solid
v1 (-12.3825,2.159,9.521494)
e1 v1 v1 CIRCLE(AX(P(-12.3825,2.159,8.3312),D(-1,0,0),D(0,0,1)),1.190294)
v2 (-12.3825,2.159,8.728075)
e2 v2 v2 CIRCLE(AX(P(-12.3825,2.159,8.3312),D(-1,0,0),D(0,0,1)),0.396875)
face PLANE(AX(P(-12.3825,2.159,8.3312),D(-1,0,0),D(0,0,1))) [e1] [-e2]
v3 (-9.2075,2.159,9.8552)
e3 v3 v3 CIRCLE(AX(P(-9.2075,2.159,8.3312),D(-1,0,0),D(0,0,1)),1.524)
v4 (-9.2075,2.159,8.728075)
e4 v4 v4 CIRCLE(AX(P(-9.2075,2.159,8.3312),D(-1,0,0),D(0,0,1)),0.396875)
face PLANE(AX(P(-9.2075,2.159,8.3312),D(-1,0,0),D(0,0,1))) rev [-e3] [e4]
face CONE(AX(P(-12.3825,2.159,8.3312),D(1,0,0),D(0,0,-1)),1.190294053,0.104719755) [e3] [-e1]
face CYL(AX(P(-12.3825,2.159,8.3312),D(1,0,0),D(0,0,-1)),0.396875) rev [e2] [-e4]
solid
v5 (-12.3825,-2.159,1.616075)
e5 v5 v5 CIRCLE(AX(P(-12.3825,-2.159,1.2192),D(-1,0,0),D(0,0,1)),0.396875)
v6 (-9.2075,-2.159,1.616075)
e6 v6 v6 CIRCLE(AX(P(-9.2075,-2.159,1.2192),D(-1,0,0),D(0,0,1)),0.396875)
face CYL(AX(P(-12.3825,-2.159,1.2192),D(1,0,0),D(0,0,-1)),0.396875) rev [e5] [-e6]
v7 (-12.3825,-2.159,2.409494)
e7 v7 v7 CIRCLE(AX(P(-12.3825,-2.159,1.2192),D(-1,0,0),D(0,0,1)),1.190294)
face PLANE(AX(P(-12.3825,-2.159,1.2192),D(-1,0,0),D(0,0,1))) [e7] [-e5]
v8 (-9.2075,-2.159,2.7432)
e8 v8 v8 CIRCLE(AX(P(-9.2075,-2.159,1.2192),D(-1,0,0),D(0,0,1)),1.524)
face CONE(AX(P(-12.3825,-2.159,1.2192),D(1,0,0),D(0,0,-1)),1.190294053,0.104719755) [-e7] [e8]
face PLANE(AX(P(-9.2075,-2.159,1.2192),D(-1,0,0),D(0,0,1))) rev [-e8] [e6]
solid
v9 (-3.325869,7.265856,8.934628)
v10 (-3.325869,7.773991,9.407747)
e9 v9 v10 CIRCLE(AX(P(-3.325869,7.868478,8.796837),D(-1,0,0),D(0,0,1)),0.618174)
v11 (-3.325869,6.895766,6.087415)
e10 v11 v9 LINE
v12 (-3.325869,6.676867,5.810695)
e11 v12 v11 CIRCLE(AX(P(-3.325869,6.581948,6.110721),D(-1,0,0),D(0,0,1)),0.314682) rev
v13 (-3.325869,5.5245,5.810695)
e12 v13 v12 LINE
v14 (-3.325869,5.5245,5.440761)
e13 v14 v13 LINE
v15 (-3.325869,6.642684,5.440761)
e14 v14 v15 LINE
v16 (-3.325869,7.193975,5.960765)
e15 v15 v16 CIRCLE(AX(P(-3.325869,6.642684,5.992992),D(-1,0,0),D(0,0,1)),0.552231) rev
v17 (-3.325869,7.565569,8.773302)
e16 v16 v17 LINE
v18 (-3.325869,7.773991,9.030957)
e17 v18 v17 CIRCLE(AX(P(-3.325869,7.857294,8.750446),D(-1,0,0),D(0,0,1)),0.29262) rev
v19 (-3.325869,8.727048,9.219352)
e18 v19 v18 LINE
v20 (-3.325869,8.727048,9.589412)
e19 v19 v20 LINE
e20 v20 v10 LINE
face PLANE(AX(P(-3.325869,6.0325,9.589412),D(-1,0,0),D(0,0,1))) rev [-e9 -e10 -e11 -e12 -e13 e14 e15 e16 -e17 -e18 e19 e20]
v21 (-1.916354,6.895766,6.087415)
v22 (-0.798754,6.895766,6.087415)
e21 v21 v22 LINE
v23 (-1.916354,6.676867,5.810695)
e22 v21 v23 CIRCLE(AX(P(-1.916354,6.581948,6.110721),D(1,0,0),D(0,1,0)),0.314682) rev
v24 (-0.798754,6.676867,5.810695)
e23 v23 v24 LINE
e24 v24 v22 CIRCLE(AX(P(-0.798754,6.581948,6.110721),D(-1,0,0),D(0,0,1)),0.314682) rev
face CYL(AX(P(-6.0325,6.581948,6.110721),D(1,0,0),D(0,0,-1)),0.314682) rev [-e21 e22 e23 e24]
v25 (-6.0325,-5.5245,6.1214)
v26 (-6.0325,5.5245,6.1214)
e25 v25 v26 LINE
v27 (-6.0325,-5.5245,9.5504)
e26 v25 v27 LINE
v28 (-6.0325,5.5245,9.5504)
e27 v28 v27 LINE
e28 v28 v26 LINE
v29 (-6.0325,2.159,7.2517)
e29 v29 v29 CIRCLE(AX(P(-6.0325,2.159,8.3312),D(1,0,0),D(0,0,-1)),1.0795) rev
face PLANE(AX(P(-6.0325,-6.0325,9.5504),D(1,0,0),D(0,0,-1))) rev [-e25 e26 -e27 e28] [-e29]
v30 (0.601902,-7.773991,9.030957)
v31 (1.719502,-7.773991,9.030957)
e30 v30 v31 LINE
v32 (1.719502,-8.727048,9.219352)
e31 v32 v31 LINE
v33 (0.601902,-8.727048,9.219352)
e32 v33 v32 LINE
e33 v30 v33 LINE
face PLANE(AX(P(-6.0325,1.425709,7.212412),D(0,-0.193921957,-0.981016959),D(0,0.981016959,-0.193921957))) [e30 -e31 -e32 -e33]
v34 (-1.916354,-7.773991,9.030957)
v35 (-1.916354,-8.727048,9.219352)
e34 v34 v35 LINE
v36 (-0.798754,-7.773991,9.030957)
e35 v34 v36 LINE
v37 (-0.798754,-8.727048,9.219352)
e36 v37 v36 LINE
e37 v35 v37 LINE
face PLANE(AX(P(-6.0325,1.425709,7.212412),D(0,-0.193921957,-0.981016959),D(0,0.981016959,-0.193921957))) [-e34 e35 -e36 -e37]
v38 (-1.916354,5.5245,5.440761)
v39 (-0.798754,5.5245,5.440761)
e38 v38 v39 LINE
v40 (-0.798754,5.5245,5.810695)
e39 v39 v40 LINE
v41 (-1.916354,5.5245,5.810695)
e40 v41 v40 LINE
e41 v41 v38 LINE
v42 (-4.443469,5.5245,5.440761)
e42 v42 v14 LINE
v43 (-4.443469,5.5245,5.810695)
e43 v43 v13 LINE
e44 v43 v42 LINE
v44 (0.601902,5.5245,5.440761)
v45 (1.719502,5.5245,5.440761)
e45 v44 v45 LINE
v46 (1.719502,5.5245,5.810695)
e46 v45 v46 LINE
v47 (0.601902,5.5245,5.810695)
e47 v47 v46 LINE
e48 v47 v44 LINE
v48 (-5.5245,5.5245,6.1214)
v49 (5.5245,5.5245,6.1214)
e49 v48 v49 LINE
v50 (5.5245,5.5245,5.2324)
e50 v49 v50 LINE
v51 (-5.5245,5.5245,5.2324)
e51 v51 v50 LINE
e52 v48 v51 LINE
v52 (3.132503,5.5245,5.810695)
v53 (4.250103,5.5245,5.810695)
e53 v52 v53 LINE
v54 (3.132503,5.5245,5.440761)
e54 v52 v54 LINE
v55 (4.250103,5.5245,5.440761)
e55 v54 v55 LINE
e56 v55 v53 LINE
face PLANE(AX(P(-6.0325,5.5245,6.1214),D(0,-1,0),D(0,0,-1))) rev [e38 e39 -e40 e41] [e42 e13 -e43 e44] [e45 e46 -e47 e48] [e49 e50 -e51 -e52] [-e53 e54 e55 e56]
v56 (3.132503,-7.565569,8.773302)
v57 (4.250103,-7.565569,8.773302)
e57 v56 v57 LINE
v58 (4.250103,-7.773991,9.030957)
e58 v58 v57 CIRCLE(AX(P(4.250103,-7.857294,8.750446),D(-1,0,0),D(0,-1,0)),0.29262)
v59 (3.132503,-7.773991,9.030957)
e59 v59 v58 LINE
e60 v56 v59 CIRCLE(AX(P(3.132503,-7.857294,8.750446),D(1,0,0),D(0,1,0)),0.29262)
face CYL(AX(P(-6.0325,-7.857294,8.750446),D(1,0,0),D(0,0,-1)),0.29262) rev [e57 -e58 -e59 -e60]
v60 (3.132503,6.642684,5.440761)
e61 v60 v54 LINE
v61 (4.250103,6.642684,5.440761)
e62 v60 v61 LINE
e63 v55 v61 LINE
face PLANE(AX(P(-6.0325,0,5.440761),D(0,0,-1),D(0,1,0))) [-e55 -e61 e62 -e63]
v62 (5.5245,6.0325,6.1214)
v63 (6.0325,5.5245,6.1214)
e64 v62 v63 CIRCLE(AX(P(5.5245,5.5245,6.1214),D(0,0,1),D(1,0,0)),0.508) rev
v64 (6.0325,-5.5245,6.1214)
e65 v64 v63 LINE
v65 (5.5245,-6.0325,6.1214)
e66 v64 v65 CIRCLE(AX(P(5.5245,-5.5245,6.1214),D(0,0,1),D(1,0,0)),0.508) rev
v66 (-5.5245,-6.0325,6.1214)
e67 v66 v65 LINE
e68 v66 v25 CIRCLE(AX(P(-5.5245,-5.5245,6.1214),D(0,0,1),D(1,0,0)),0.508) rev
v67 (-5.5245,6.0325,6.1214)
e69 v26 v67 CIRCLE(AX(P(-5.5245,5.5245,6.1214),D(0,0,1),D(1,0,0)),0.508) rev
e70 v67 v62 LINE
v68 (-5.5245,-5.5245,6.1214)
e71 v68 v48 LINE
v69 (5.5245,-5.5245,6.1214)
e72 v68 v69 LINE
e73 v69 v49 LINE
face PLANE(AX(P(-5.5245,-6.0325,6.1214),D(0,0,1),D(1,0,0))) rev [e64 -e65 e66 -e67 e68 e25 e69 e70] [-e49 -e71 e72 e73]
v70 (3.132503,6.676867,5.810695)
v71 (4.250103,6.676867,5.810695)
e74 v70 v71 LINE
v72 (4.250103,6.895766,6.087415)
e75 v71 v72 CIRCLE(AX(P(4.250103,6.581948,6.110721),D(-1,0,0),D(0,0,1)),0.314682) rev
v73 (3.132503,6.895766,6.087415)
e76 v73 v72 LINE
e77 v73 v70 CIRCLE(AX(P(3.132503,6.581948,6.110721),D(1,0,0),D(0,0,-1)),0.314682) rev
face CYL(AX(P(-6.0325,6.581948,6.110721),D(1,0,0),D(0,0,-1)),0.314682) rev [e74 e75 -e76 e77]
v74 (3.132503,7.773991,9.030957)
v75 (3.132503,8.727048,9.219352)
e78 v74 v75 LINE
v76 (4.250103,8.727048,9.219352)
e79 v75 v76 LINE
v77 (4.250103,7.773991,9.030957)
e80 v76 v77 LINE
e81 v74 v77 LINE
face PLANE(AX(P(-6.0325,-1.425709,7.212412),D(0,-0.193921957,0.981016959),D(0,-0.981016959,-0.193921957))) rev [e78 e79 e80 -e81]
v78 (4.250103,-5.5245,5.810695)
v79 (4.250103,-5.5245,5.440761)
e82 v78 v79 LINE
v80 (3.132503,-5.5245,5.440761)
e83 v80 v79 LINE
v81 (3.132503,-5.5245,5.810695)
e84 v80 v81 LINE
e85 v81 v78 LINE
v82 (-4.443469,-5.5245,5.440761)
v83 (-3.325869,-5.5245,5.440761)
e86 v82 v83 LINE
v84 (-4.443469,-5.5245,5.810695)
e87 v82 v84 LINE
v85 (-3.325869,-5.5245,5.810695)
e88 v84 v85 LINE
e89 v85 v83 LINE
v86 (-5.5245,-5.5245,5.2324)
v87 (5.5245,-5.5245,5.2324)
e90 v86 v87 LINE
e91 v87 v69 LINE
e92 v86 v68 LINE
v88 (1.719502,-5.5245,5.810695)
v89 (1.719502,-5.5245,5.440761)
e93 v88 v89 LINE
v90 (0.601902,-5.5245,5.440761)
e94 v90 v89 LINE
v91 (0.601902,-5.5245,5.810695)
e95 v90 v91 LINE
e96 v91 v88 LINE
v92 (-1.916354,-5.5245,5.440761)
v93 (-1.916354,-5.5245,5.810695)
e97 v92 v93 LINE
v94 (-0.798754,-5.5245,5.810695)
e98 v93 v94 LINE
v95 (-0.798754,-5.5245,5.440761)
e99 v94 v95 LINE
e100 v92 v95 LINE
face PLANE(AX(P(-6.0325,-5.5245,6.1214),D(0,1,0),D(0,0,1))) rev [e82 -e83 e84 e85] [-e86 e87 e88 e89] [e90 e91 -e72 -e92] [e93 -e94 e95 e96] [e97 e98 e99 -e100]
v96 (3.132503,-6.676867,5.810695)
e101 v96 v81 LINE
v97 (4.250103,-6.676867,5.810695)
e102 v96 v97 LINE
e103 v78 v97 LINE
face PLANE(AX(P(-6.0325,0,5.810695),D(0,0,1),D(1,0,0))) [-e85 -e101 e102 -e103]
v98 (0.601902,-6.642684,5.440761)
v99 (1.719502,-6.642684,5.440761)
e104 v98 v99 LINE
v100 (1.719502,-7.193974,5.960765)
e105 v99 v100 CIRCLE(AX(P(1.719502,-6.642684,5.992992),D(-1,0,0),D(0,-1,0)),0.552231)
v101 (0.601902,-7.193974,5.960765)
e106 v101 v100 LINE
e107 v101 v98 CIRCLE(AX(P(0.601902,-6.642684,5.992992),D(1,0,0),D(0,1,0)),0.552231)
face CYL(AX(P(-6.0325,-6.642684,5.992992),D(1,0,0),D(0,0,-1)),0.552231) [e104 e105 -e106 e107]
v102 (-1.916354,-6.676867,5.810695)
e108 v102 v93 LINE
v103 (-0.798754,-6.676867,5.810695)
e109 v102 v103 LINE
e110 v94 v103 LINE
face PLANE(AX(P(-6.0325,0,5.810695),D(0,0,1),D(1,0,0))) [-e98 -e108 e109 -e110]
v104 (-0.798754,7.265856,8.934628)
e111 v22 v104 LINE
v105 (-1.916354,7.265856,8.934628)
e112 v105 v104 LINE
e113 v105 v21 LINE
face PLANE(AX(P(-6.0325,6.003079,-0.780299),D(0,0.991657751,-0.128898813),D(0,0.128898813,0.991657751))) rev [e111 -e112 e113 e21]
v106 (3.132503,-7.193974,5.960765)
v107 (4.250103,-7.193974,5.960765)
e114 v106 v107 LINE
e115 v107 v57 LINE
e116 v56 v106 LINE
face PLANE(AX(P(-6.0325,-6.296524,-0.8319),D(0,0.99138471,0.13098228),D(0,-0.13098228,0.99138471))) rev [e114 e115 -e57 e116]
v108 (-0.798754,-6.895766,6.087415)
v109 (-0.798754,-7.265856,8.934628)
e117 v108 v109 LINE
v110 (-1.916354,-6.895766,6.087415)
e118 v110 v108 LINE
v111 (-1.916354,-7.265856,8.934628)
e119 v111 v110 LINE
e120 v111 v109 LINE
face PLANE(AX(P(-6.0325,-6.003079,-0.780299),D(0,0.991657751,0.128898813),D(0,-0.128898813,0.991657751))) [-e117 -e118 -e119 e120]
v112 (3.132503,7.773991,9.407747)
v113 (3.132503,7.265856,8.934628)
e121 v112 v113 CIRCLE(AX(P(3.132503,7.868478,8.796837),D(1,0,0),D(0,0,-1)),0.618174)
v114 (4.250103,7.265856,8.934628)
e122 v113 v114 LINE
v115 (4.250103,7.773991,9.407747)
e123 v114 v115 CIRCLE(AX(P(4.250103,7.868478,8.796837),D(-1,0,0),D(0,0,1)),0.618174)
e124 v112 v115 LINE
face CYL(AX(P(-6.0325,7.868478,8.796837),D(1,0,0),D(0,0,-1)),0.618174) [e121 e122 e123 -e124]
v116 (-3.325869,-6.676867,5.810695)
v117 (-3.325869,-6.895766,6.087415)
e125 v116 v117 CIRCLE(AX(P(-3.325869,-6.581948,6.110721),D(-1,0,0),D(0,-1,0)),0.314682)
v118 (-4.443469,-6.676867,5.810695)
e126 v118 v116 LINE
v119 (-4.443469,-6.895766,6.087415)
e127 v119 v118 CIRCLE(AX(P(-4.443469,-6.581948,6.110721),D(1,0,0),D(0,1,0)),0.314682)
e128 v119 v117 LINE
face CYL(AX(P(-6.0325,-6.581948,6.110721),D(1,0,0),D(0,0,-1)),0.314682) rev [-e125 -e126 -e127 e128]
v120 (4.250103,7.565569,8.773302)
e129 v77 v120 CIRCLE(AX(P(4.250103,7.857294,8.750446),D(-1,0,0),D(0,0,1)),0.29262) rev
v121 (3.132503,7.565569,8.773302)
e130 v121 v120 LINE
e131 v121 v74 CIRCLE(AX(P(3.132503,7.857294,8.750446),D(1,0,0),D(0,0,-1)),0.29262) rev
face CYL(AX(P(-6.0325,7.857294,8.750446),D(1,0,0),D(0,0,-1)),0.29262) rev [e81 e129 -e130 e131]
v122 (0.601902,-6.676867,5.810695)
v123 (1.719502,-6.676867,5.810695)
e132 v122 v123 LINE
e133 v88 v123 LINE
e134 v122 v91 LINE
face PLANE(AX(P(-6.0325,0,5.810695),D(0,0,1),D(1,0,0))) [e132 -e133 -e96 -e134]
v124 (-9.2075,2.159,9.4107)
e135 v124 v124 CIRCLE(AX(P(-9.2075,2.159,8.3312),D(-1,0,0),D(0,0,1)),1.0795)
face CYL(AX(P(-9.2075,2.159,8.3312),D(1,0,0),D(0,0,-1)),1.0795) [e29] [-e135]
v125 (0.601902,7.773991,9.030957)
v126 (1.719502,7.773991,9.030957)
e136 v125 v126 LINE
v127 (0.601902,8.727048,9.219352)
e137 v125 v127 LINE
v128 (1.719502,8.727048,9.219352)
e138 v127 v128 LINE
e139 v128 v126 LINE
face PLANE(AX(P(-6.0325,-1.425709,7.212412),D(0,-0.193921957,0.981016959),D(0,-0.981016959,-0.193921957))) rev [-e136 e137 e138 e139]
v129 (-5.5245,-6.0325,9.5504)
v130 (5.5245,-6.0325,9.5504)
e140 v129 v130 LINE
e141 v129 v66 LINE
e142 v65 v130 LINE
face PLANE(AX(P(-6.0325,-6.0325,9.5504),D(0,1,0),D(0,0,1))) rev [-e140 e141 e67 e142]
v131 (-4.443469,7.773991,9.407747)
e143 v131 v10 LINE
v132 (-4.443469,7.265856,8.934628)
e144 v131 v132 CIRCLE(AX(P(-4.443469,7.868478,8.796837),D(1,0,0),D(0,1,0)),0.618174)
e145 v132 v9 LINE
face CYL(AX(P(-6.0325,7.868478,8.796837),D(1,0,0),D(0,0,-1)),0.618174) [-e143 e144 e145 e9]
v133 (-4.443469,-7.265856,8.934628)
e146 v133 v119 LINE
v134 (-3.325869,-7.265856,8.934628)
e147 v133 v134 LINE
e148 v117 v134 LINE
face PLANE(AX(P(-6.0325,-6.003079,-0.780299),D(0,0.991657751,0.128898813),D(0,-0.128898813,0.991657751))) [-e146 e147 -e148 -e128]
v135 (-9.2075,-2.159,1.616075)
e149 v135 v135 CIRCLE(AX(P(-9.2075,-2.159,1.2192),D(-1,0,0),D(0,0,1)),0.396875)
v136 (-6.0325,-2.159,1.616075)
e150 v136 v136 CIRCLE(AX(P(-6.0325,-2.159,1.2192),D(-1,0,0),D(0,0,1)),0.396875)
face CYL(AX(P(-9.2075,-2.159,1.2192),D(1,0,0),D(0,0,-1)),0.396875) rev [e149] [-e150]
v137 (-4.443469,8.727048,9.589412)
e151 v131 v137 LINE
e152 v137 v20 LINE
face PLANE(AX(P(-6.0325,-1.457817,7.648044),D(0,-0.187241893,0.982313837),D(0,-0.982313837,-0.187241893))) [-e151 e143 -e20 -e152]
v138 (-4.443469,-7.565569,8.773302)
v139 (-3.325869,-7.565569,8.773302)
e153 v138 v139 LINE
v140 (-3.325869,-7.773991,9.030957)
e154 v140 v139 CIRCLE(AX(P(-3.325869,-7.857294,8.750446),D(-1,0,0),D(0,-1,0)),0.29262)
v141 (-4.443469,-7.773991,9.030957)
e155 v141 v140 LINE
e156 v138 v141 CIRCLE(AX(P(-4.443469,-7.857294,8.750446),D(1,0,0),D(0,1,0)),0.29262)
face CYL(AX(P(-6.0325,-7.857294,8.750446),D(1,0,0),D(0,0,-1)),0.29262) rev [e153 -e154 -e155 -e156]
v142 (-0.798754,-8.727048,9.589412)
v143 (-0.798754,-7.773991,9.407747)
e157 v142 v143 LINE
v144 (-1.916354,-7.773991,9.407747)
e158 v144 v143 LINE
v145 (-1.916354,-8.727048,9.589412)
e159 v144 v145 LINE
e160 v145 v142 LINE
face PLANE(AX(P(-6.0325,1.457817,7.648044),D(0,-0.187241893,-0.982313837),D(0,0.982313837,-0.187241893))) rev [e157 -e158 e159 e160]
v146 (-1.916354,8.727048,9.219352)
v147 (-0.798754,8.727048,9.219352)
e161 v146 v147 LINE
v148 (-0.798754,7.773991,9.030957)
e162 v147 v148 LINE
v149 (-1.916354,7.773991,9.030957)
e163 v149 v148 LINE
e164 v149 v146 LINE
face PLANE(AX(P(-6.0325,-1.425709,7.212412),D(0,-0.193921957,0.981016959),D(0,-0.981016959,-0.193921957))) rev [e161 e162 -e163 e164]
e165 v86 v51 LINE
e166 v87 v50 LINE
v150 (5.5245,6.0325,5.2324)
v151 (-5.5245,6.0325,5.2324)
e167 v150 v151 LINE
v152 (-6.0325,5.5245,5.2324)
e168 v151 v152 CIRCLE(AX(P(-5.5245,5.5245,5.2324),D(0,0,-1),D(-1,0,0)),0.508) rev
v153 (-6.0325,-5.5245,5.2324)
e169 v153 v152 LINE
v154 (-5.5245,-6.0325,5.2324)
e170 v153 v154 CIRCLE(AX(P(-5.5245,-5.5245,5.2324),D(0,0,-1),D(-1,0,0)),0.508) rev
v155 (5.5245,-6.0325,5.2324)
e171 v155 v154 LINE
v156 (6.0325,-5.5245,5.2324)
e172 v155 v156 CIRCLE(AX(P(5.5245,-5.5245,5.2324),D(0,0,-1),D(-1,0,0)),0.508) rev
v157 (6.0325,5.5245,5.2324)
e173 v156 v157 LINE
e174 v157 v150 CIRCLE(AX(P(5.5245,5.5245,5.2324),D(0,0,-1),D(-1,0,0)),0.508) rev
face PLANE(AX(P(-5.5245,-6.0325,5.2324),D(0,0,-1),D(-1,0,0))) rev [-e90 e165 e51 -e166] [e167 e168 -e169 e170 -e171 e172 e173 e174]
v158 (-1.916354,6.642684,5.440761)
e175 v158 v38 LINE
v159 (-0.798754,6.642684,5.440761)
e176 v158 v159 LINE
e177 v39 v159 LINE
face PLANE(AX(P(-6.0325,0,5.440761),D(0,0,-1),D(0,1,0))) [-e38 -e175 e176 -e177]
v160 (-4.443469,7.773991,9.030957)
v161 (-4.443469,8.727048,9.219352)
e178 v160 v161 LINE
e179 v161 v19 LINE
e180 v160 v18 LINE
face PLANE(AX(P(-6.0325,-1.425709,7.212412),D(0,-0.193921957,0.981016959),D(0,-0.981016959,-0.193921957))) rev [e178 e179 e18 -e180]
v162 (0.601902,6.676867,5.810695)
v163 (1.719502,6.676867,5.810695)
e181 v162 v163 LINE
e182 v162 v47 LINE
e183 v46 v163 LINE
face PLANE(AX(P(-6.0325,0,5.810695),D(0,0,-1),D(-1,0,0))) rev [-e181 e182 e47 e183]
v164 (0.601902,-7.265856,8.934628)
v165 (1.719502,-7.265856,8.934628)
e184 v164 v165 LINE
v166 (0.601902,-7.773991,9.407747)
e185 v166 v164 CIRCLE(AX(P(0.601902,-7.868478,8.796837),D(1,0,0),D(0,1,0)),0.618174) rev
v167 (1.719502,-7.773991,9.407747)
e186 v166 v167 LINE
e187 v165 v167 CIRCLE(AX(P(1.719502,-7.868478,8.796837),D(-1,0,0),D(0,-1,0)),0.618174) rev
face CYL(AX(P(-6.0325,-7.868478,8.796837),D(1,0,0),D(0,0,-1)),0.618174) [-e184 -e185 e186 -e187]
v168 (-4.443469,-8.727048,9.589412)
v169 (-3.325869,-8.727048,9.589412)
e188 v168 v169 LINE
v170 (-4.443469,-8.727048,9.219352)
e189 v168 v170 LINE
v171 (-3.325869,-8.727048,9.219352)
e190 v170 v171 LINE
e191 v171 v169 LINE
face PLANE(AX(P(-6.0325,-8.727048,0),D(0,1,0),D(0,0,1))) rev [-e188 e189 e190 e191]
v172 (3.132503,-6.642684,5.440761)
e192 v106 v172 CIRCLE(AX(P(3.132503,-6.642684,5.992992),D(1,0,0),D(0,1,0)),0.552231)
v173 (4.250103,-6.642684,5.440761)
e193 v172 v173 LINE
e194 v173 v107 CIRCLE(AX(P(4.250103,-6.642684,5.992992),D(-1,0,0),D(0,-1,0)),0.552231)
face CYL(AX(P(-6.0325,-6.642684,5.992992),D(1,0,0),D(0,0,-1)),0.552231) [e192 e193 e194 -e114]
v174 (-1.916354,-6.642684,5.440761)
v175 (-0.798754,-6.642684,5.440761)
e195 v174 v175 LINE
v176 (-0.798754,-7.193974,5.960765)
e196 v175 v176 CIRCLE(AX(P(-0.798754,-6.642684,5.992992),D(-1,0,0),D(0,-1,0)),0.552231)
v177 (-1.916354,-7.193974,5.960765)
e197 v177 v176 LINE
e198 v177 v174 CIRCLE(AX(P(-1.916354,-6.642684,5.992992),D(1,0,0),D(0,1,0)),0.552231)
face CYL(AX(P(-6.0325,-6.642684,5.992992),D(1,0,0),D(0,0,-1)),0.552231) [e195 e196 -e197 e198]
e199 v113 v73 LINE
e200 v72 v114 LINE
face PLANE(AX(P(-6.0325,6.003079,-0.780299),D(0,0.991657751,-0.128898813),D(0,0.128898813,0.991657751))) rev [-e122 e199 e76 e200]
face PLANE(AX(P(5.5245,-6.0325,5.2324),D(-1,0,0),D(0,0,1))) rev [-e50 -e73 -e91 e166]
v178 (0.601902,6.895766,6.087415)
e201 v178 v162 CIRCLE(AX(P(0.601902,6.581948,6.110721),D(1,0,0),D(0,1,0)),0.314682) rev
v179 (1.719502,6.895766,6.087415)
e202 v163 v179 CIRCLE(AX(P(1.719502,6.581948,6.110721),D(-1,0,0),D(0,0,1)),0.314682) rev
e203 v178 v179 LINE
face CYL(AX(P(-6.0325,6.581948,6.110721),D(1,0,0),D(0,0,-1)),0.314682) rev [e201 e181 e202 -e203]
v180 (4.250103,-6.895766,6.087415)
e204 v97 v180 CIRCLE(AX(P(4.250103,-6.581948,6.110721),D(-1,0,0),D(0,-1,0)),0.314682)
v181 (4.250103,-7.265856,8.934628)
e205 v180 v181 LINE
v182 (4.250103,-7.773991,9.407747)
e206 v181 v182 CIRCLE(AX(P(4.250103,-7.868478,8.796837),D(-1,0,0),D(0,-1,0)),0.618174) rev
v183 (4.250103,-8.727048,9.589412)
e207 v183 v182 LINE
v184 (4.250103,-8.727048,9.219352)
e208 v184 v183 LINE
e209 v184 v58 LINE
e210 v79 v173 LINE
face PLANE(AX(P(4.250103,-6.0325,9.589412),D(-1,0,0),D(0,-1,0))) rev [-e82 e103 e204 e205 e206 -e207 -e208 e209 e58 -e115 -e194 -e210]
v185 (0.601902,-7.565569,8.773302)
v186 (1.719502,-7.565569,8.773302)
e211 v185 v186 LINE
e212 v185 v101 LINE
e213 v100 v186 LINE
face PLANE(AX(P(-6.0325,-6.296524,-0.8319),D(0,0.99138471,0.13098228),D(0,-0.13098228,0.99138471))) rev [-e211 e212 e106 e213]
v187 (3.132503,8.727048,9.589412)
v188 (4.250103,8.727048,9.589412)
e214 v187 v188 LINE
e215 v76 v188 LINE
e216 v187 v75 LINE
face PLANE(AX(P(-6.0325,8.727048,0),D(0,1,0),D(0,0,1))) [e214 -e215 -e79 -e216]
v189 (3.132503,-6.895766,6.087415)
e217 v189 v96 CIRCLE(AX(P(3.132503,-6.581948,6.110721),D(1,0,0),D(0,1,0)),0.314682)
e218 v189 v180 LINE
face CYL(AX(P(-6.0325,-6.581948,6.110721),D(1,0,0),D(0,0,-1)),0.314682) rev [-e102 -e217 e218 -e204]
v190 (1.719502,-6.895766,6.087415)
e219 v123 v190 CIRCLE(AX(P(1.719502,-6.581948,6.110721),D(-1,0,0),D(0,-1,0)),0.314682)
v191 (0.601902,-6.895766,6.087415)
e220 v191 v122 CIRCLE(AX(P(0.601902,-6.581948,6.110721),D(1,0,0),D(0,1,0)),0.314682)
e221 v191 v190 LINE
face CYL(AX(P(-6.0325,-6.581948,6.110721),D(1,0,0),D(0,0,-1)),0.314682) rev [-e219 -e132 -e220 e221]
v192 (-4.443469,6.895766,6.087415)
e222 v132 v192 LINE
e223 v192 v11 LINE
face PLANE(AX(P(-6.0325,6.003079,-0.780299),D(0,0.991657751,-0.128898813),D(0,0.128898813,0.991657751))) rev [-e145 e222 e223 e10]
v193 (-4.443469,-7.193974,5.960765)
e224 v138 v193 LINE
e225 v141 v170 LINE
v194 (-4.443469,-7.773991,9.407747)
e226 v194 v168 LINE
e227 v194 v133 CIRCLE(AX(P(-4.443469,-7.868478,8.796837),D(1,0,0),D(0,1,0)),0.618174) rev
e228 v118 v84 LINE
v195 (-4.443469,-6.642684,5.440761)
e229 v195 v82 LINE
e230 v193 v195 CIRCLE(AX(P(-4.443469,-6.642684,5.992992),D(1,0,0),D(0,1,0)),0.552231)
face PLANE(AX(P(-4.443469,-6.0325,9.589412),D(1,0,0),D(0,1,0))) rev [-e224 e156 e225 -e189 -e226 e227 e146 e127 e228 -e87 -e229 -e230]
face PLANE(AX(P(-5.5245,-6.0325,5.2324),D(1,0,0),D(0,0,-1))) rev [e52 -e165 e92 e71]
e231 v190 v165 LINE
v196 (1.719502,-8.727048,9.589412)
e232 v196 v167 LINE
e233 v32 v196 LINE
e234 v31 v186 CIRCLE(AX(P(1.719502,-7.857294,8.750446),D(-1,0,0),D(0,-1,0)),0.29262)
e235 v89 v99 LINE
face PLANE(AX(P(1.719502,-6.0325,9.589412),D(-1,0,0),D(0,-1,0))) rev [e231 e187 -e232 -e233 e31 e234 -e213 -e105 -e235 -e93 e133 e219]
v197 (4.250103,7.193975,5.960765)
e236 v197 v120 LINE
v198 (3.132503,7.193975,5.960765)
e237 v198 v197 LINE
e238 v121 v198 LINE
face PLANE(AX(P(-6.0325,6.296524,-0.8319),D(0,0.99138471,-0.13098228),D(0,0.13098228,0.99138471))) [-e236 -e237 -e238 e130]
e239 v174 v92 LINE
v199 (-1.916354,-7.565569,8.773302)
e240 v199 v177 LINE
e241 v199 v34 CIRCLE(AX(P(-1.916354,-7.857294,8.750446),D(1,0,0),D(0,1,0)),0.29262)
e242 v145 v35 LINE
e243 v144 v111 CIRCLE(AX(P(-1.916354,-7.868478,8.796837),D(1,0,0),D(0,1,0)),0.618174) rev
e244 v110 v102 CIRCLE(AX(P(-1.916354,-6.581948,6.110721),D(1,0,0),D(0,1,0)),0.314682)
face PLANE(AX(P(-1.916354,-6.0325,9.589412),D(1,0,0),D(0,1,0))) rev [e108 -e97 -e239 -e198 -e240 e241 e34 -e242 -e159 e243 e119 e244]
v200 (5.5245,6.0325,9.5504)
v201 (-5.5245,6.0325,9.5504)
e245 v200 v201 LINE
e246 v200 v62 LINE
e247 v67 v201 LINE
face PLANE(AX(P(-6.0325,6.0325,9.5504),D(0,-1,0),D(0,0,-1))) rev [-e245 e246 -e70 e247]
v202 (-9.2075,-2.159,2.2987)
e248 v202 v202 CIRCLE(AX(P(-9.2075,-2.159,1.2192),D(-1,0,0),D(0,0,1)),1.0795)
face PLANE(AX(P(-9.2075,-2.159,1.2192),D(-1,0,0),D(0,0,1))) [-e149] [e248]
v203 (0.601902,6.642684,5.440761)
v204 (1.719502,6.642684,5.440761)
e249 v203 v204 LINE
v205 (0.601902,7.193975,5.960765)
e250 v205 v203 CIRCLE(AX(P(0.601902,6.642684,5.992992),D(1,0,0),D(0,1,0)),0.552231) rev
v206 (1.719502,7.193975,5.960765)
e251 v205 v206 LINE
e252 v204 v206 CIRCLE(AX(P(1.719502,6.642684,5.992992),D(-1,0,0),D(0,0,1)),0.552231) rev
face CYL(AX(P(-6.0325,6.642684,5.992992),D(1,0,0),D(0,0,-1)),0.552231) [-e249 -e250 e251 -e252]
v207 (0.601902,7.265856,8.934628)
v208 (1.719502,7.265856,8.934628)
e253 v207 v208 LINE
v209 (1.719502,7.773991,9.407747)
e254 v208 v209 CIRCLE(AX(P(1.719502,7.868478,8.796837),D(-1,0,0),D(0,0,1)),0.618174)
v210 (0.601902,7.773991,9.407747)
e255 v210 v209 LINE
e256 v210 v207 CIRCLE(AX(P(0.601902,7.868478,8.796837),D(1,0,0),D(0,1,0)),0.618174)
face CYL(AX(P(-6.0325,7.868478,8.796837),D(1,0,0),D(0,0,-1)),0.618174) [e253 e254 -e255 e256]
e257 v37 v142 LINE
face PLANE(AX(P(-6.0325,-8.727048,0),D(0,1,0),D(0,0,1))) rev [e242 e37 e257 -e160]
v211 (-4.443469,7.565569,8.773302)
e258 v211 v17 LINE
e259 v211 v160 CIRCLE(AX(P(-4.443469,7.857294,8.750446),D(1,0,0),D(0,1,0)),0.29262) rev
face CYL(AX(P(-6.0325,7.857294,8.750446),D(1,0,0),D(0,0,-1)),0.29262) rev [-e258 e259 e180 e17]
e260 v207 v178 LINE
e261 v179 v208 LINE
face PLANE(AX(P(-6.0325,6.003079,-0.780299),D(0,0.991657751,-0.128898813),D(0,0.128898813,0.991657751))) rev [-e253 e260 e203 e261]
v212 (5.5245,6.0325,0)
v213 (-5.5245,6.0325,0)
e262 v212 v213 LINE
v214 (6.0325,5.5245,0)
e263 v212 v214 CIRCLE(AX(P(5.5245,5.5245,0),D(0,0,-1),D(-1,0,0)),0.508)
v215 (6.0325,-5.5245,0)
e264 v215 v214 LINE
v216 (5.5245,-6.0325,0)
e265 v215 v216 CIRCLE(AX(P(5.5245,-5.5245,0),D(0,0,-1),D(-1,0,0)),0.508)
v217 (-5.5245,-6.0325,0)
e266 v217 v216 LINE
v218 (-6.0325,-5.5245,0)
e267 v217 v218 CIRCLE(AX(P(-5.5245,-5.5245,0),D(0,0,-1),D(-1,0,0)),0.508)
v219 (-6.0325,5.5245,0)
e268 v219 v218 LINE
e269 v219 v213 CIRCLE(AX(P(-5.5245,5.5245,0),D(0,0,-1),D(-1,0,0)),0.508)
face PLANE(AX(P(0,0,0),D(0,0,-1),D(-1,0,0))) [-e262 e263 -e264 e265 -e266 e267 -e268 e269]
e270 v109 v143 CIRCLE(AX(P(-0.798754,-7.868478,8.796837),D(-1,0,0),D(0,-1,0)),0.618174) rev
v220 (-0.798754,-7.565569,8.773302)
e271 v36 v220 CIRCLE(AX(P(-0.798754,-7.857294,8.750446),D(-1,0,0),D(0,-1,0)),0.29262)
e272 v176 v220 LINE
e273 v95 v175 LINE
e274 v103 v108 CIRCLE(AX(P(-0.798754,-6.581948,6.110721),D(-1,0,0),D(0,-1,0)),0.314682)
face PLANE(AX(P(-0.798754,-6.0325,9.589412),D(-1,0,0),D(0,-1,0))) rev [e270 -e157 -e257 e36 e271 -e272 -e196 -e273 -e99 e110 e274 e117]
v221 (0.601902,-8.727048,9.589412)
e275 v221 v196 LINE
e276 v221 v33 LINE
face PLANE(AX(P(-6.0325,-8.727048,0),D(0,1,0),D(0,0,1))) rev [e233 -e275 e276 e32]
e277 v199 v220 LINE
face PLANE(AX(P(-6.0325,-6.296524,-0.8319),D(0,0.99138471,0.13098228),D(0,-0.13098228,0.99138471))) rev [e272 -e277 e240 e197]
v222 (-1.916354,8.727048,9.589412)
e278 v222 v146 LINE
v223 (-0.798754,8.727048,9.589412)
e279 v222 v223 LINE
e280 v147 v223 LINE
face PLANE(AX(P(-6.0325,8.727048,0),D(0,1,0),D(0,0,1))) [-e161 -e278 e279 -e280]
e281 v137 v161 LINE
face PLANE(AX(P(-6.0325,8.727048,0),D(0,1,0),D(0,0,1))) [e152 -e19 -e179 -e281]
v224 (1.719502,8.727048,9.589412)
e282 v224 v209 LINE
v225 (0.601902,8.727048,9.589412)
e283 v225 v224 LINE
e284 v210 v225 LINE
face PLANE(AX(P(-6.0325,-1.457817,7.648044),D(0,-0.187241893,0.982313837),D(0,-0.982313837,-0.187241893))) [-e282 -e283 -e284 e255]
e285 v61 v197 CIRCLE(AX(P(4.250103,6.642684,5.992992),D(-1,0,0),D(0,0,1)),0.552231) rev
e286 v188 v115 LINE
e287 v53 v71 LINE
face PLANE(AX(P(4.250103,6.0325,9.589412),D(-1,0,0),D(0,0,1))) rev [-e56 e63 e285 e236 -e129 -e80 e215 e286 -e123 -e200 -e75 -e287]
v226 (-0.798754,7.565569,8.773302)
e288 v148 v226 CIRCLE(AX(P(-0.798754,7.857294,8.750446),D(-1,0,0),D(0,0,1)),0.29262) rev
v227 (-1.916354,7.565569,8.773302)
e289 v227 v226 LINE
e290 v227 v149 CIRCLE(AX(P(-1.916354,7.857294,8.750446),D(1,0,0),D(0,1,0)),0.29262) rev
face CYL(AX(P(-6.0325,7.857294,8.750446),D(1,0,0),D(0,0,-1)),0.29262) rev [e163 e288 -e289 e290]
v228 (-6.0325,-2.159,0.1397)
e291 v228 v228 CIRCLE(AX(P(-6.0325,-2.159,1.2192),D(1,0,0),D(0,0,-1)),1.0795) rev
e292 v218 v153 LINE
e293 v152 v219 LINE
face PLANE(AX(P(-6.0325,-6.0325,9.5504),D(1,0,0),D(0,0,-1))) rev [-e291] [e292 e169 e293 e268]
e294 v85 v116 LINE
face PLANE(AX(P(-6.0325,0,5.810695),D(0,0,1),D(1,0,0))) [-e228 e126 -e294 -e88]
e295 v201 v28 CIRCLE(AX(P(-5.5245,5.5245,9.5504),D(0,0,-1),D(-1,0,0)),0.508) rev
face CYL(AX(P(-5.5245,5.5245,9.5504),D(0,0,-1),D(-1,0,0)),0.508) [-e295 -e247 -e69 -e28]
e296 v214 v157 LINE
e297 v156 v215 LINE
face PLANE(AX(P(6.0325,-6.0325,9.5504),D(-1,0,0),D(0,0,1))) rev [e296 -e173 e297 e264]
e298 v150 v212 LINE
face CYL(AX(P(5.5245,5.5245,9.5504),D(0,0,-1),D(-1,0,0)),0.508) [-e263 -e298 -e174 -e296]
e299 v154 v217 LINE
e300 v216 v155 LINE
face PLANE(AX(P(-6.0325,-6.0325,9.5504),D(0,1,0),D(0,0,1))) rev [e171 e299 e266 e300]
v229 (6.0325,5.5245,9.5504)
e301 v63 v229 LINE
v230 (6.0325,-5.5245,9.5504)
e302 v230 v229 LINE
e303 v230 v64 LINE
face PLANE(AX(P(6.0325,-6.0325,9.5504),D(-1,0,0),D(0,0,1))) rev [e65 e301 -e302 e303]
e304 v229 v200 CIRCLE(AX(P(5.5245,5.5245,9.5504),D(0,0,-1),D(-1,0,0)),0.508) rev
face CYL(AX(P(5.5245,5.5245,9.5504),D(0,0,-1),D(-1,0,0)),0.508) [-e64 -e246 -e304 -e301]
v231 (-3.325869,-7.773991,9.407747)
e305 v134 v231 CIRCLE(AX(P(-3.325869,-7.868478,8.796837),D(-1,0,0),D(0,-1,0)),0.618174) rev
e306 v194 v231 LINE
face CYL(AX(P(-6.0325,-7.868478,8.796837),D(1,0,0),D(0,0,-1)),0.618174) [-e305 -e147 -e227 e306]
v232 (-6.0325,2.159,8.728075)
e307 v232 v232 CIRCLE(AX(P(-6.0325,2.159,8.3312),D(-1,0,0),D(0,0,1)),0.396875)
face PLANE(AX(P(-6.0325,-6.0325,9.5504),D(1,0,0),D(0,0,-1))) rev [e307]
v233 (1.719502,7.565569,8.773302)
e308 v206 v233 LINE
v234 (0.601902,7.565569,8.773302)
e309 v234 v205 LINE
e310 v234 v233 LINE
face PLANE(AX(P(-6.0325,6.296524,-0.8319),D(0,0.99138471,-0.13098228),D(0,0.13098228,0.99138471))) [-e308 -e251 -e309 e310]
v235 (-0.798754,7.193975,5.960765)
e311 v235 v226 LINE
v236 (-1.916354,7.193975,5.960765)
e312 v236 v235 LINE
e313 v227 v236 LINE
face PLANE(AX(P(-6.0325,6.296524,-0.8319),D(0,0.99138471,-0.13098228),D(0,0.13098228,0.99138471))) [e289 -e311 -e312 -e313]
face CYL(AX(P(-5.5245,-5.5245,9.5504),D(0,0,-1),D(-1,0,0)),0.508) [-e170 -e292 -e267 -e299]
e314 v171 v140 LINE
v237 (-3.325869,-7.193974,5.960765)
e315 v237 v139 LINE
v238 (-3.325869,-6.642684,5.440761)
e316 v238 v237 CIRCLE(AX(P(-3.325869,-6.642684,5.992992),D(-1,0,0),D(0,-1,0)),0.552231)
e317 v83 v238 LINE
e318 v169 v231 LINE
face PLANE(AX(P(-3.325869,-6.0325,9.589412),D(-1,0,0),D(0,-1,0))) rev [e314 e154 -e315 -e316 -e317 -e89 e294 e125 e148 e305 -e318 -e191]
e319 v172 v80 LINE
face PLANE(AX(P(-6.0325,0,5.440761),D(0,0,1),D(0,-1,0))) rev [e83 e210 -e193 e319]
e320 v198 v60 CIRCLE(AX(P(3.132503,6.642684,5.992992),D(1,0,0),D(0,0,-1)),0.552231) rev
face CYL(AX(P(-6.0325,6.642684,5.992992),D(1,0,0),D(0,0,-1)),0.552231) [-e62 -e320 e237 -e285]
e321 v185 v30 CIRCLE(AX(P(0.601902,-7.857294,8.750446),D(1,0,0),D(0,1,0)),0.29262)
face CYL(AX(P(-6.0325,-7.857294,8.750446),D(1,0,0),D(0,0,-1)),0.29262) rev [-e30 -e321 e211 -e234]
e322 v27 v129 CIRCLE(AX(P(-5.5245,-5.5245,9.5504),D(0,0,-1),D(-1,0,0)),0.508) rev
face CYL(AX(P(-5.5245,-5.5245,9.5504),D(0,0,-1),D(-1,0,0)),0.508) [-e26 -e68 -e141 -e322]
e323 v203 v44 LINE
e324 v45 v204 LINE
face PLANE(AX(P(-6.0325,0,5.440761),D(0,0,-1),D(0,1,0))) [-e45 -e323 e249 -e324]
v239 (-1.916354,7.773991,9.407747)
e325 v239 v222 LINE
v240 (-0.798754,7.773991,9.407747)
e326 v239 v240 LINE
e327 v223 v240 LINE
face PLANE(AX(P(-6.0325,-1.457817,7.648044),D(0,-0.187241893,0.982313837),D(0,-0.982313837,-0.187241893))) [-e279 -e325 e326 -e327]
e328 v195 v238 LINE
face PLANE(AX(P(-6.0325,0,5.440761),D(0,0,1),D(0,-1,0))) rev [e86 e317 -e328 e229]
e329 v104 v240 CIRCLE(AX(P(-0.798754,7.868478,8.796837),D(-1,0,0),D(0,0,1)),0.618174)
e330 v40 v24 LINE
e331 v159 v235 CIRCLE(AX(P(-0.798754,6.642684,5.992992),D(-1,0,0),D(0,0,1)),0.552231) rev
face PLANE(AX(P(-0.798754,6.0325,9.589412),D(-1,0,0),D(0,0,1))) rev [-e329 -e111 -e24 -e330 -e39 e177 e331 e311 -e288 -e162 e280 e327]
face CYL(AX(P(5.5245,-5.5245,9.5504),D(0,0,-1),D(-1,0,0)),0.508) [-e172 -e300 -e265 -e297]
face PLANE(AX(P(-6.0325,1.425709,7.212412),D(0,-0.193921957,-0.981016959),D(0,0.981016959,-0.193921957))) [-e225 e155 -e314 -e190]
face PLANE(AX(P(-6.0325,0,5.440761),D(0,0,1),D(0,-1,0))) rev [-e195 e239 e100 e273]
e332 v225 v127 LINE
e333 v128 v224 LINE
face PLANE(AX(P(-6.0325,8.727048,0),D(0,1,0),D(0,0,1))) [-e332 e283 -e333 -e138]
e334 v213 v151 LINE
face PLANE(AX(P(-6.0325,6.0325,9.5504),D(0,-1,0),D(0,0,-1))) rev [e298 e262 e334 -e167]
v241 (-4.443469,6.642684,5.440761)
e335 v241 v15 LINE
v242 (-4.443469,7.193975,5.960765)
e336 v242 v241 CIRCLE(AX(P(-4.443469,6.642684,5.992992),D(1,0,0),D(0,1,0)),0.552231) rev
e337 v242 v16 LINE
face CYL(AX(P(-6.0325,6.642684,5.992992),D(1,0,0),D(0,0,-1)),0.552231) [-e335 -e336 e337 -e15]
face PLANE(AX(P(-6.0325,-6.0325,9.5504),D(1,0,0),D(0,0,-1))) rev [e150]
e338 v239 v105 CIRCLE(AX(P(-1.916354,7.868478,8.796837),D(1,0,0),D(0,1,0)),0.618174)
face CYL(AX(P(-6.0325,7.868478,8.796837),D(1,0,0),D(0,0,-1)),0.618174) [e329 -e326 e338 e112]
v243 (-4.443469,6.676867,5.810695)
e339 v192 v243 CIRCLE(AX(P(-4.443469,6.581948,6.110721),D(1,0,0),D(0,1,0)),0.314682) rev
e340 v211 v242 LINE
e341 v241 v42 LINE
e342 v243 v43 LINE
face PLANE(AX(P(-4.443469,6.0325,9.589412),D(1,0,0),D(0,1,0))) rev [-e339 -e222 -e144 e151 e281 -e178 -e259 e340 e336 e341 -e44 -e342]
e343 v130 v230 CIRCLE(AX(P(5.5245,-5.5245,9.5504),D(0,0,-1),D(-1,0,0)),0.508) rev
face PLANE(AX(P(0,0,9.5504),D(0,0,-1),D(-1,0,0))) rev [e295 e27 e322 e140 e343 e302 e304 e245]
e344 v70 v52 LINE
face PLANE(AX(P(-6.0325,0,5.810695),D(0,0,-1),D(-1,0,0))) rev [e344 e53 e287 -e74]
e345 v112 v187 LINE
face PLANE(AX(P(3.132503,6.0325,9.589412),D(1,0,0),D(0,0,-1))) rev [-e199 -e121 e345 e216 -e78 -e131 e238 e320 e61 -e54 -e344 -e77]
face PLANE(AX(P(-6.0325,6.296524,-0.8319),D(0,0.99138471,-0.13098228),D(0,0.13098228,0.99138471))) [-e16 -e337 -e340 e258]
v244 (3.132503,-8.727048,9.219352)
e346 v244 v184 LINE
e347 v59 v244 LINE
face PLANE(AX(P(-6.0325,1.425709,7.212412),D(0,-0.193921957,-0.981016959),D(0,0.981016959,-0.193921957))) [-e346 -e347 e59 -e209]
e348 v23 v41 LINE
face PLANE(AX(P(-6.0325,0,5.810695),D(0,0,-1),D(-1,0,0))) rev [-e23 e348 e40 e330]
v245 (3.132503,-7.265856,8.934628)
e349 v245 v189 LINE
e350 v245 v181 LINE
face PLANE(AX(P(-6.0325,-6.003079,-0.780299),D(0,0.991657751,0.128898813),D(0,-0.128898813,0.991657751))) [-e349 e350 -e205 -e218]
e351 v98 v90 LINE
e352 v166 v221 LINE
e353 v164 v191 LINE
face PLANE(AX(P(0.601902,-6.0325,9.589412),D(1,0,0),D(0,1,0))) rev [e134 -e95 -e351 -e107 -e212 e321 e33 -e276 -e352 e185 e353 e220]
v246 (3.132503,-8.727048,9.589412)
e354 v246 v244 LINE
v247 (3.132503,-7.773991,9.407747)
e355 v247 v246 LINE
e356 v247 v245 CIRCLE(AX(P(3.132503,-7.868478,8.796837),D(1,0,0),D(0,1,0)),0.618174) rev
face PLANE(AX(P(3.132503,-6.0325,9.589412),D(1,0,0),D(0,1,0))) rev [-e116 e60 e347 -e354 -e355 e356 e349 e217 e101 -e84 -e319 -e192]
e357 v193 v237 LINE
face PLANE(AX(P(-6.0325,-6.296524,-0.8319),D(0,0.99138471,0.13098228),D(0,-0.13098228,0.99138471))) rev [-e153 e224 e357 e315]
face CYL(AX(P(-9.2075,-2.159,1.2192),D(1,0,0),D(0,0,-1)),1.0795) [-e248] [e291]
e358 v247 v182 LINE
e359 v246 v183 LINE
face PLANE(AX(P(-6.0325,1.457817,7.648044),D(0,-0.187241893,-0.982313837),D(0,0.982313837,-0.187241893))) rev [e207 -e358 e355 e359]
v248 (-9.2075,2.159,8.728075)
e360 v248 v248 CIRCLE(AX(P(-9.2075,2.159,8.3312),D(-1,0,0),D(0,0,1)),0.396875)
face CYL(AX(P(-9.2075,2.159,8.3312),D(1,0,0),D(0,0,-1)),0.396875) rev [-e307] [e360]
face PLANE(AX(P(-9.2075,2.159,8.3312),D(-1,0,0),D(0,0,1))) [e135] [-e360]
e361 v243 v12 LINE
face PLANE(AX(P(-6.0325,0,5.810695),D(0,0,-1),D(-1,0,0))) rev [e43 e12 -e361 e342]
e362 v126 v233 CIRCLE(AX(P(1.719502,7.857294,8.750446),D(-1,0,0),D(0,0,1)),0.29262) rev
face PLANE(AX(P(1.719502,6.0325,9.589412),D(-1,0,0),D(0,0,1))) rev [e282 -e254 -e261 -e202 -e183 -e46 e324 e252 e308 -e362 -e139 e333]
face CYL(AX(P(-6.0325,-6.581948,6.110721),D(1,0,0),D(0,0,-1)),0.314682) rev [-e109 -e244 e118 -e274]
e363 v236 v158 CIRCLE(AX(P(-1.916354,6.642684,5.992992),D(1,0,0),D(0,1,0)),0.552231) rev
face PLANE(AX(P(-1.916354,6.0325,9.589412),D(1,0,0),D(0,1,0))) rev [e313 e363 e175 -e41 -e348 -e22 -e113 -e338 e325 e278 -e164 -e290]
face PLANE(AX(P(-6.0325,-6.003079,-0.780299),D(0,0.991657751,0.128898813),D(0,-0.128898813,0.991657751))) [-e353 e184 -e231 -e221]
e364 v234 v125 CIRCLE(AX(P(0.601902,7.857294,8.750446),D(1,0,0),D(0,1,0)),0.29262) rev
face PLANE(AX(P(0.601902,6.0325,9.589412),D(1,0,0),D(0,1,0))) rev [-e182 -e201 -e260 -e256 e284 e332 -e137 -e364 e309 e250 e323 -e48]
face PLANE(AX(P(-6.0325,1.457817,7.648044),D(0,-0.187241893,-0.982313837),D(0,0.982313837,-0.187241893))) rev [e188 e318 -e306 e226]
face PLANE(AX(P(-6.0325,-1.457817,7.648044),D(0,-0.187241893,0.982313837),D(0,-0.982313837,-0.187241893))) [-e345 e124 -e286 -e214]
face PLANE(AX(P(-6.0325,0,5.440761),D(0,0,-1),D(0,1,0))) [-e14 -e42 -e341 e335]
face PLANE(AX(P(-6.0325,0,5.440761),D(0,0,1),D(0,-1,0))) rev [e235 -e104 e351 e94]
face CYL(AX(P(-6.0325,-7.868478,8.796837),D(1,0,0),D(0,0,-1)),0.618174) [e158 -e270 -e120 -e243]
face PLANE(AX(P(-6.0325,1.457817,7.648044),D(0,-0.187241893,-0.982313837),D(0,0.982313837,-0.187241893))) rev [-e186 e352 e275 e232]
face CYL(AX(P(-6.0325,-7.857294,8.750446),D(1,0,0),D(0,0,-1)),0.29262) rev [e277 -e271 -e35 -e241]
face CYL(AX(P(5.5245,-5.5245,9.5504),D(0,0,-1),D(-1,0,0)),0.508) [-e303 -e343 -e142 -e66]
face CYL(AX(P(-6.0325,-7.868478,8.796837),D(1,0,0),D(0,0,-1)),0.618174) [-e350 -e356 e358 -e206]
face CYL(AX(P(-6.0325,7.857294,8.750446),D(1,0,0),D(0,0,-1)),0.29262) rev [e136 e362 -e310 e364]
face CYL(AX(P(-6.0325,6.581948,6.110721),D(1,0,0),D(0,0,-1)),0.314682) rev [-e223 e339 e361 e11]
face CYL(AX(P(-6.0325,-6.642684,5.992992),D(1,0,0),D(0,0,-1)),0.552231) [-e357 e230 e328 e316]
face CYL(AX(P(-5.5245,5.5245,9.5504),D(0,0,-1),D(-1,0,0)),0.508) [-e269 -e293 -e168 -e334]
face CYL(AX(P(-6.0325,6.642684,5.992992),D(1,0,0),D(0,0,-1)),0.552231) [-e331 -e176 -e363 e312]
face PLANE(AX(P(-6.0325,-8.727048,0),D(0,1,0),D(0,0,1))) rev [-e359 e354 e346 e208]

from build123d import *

# Parameters (mm, degrees)
SKETCH1_W             = 12.065
SKETCH1_H             = 12.065
BOSS_EXTRUDE1_DEPTH   = 9.5504
SKETCH3_W             = 0.508
SKETCH3_H             = 0.889
CUT_EXTRUDE1_DEPTH    = 17.527716763
SKETCH4_W             = 0.889
SKETCH4_H             = 0.508
CUT_EXTRUDE2_DEPTH    = 17.160614017
BOSS_EXTRUDE2_DEPTH   = 12.065
SKETCH6_W             = 2.010508142
SKETCH6_H             = 3.048
SKETCH6_W_2           = 1.413000982
SKETCH6_W_3           = 1.400656211
SKETCH6_W_4           = 1.409514657
SKETCH6_W_5           = 1.742646619
CUT_EXTRUDE3_DEPTH    = 15.300672912
SKETCH7_W             = 1.589030952
SKETCH7_H             = 0.369934407
SKETCH7_W_2           = 1.409514657
SKETCH7_W_3           = 1.400656211
SKETCH7_W_4           = 1.413000982
SKETCH7_W_5           = 1.782397198
CUT_EXTRUDE4_DEPTH    = 0.508
SKETCH8_W             = 1.589030952
SKETCH8_H             = 0.369934407
SKETCH8_W_2           = 1.409514657
SKETCH8_W_3           = 1.400656211
SKETCH8_W_4           = 1.413000982
SKETCH8_W_5           = 1.782397198
CUT_EXTRUDE5_DEPTH    = 0.508
FILLET1_R             = 0.508
SKETCH9_R             = 1.0795
SKETCH9_R_2           = 0.396875
BOSS_EXTRUDE3_DEPTH   = 3.175
SKETCH10_R            = 1.524
SKETCH10_R_2          = 0.396875
BOSS_EXTRUDE4_DEPTH   = 3.175
BOSS_EXTRUDE4_2_DEPTH = 3.175
CHAMFER1_SIZE         = 3.175
CHAMFER1_SIZE_2       = 0.333705947
CHAMFER2_SIZE         = 3.175
CHAMFER2_SIZE_2       = 0.333705947


with BuildPart() as part:
    # Sketch1 → Boss-Extrude1 (new body)
    with BuildSketch(Plane.XY):
        Rectangle(SKETCH1_W, SKETCH1_H)
    extrude(amount=BOSS_EXTRUDE1_DEPTH)

    # Sketch3 → Cut-Extrude1 (cut, through all)
    with BuildSketch(Plane(origin=(0, 6.0325, 0), x_dir=(1, 0, 0), z_dir=(0, 1, 0))):
        with Locations((-5.7785, -5.6769)):
            Rectangle(SKETCH3_W, SKETCH3_H)
        with Locations((5.7785, -5.6769)):
            Rectangle(SKETCH3_W, SKETCH3_H)
    extrude(amount=-CUT_EXTRUDE1_DEPTH, mode=Mode.SUBTRACT)

    # Sketch4 → Cut-Extrude2 (cut, through all)
    with BuildSketch(Plane(origin=(5.5245, 0, 0), x_dir=(0, 0, -1), z_dir=(1, 0, 0))):
        with Locations((-5.6769, 5.7785)):
            Rectangle(SKETCH4_W, SKETCH4_H)
        with Locations((-5.6769, -5.7785)):
            Rectangle(SKETCH4_W, SKETCH4_H)
    extrude(amount=-CUT_EXTRUDE2_DEPTH, mode=Mode.SUBTRACT)

    # Sketch5 → Boss-Extrude2 (add, through all)
    with BuildSketch(Plane(origin=(6.0325, 0, 0), x_dir=(0, 0, -1), z_dir=(1, 0, 0))):
        with BuildLine():
            ThreePointArc((-8.934627895, 7.265855746), (-9.249262248, 7.447228638), (-9.407747298, 7.773990618))
            Line((-9.407747298, 7.773990618), (-9.589412438, 8.72704753))
            Line((-9.589412438, 8.72704753), (-9.219352327, 8.72704753))
            Line((-9.219352327, 8.72704753), (-9.030957356, 7.773990618))
            ThreePointArc((-9.030957356, 7.773990618), (-8.934478337, 7.629789758), (-8.773302251, 7.565568589))
            Line((-8.773302251, 7.565568589), (-5.960764741, 7.193974625))
            ThreePointArc((-5.960764741, 7.193974625), (-5.591273278, 7.021604846), (-5.440761064, 6.642683921))
            Line((-5.440761064, 6.642683921), (-5.440761064, 5.5245))
            Line((-5.440761064, 5.5245), (-5.810695471, 5.5245))
            Line((-5.810695471, 5.5245), (-5.810695471, 6.676866964))
            ThreePointArc((-5.810695471, 6.676866964), (-5.915490425, 6.828747463), (-6.087415345, 6.895766048))
            Line((-6.087415345, 6.895766048), (-8.934627895, 7.265855746))
        make_face()
        with BuildLine():
            ThreePointArc((-5.440761064, -6.642683921), (-5.591273278, -7.021604846), (-5.960764741, -7.193974625))
            Line((-5.960764741, -7.193974625), (-8.773302251, -7.565568589))
            ThreePointArc((-8.773302251, -7.565568589), (-8.934478337, -7.629789758), (-9.030957356, -7.773990618))
            Line((-9.030957356, -7.773990618), (-9.219352327, -8.72704753))
            Line((-9.219352327, -8.72704753), (-9.589412438, -8.72704753))
            Line((-9.589412438, -8.72704753), (-9.407747298, -7.773990618))
            ThreePointArc((-9.407747298, -7.773990618), (-9.249262248, -7.447228638), (-8.934627895, -7.265855746))
            Line((-8.934627895, -7.265855746), (-6.087415345, -6.895766048))
            ThreePointArc((-6.087415345, -6.895766048), (-5.915490425, -6.828747463), (-5.810695471, -6.676866964))
            Line((-5.810695471, -6.676866964), (-5.810695471, -5.5245))
            Line((-5.810695471, -5.5245), (-5.440761064, -5.5245))
            Line((-5.440761064, -5.5245), (-5.440761064, -6.642683921))
        make_face()
    extrude(amount=-BOSS_EXTRUDE2_DEPTH)

    # Sketch6 → Cut-Extrude3 (cut, through all)
    with BuildSketch(Plane(origin=(0, 0, 0), x_dir=(-1, 0, 0), z_dir=(0, 0, -1))):
        with Locations((-5.255356873, 7.5565)):
            Rectangle(SKETCH6_W, SKETCH6_H)
        with Locations((-2.426002311, 7.5565)):
            Rectangle(SKETCH6_W_2, SKETCH6_H)
        with Locations((0.098426285, 7.5565)):
            Rectangle(SKETCH6_W_3, SKETCH6_H)
        with Locations((2.621111719, 7.5565)):
            Rectangle(SKETCH6_W_4, SKETCH6_H)
        with Locations((5.314792358, 7.5565)):
            Rectangle(SKETCH6_W_5, SKETCH6_H)
        with Locations((5.314792358, -7.5565)):
            Rectangle(SKETCH6_W_5, SKETCH6_H)
        with Locations((2.621111719, -7.5565)):
            Rectangle(SKETCH6_W_4, SKETCH6_H)
        with Locations((0.098426285, -7.5565)):
            Rectangle(SKETCH6_W_3, SKETCH6_H)
        with Locations((-2.426002311, -7.5565)):
            Rectangle(SKETCH6_W_2, SKETCH6_H)
        with Locations((-5.255356873, -7.5565)):
            Rectangle(SKETCH6_W, SKETCH6_H)
    extrude(amount=-CUT_EXTRUDE3_DEPTH, mode=Mode.SUBTRACT)

    # Sketch7 → Cut-Extrude4 (cut)
    with BuildSketch(Plane(origin=(0, 6.0325, 0), x_dir=(1, 0, 0), z_dir=(0, 1, 0))):
        with Locations((-5.237984524, -5.625728268)):
            Rectangle(SKETCH7_W, SKETCH7_H)
        with Locations((-2.621111719, -5.625728268)):
            Rectangle(SKETCH7_W_2, SKETCH7_H)
        with Locations((-0.098426285, -5.625728268)):
            Rectangle(SKETCH7_W_3, SKETCH7_H)
        with Locations((2.426002311, -5.625728268)):
            Rectangle(SKETCH7_W_4, SKETCH7_H)
        with Locations((5.141301401, -5.625728268)):
            Rectangle(SKETCH7_W_5, SKETCH7_H)
    extrude(amount=-CUT_EXTRUDE4_DEPTH, mode=Mode.SUBTRACT)

    # Sketch8 → Cut-Extrude5 (cut)
    with BuildSketch(Plane.XZ.offset(6.0325)):
        with Locations((-5.237984524, 5.625728268)):
            Rectangle(SKETCH8_W, SKETCH8_H)
        with Locations((-2.621111719, 5.625728268)):
            Rectangle(SKETCH8_W_2, SKETCH8_H)
        with Locations((-0.098426285, 5.625728268)):
            Rectangle(SKETCH8_W_3, SKETCH8_H)
        with Locations((2.426002311, 5.625728268)):
            Rectangle(SKETCH8_W_4, SKETCH8_H)
        with Locations((5.141301401, 5.625728268)):
            Rectangle(SKETCH8_W_5, SKETCH8_H)
    extrude(amount=-CUT_EXTRUDE5_DEPTH, mode=Mode.SUBTRACT)

    # Fillet1
    fillet1_edges = [part.edges().sort_by_distance(p)[0] for p in [
        (6.0325, 6.0325, 2.6162),
        (6.0325, 6.0325, 7.8359),
        (-6.0325, 6.0325, 7.8359),
        (-6.0325, 6.0325, 2.6162),
        (-6.0325, -6.0325, 7.8359),
        (-6.0325, -6.0325, 2.6162),
        (6.0325, -6.0325, 7.8359),
        (6.0325, -6.0325, 2.6162),
    ]]
    fillet(fillet1_edges, radius=FILLET1_R)

    # Sketch9 → Boss-Extrude3 (add)
    # profile 1 of 2: a face of its own
    with BuildSketch(Plane.ZY.offset(6.0325)):
        with Locations(Location((1.2192, -2.159, 0), (0, 0, 180))):
            Circle(SKETCH9_R)
        with Locations((1.2192, -2.159)):
            Circle(SKETCH9_R_2, mode=Mode.SUBTRACT)
    # profile 2 of 2: a face of its own
    with BuildSketch(Plane.ZY.offset(6.0325)):
        with Locations(Location((8.3312, 2.159, 0), (0, 0, 180))):
            Circle(SKETCH9_R)
        with Locations((8.3312, 2.159)):
            Circle(SKETCH9_R_2, mode=Mode.SUBTRACT)
    extrude(amount=BOSS_EXTRUDE3_DEPTH)


with BuildPart() as body_2:
    # Sketch10 → Boss-Extrude4 (new body)
    with BuildSketch(Plane.ZY.offset(9.2075)):
        with Locations((1.2192, -2.159)):
            Circle(SKETCH10_R)
        with Locations((1.2192, -2.159)):
            Circle(SKETCH10_R_2, mode=Mode.SUBTRACT)
    extrude(amount=BOSS_EXTRUDE4_DEPTH)

    # Chamfer2
    # the kernel refuses this chamfer: 3.175, 0.333705947 mm, written as the material it takes off along each edge
    with BuildSketch(Plane(origin=(-12.3825, -2.159, 1.2192), x_dir=(0, 0, 1), z_dir=(0, -1, 0))) as chamfer2_piece_1:
        Polygon((1.524, -CHAMFER2_SIZE), (1.524 - CHAMFER2_SIZE_2, 0), (1.524, 0), align=None)
    revolve(axis=Axis((-12.3825, -2.159, 1.2192), (-1, 0, 0)), mode=Mode.SUBTRACT)


with BuildPart() as body_3:
    # Sketch10 → Boss-Extrude4 2 (new body)
    with BuildSketch(Plane.ZY.offset(9.2075)):
        with Locations((8.3312, 2.159)):
            Circle(SKETCH10_R)
        with Locations((8.3312, 2.159)):
            Circle(SKETCH10_R_2, mode=Mode.SUBTRACT)
    extrude(amount=BOSS_EXTRUDE4_2_DEPTH)

    # Chamfer1
    # the kernel refuses this chamfer: 3.175, 0.333705947 mm, written as the material it takes off along each edge
    with BuildSketch(Plane(origin=(-12.3825, 2.159, 8.3312), x_dir=(0, 0, 1), z_dir=(0, -1, 0))) as chamfer1_piece_1:
        Polygon((1.524, -CHAMFER1_SIZE), (1.524 - CHAMFER1_SIZE_2, 0), (1.524, 0), align=None)
    revolve(axis=Axis((-12.3825, 2.159, 8.3312), (-1, 0, 0)), mode=Mode.SUBTRACT)


solid = Compound([part.part, body_2.part, body_3.part])
